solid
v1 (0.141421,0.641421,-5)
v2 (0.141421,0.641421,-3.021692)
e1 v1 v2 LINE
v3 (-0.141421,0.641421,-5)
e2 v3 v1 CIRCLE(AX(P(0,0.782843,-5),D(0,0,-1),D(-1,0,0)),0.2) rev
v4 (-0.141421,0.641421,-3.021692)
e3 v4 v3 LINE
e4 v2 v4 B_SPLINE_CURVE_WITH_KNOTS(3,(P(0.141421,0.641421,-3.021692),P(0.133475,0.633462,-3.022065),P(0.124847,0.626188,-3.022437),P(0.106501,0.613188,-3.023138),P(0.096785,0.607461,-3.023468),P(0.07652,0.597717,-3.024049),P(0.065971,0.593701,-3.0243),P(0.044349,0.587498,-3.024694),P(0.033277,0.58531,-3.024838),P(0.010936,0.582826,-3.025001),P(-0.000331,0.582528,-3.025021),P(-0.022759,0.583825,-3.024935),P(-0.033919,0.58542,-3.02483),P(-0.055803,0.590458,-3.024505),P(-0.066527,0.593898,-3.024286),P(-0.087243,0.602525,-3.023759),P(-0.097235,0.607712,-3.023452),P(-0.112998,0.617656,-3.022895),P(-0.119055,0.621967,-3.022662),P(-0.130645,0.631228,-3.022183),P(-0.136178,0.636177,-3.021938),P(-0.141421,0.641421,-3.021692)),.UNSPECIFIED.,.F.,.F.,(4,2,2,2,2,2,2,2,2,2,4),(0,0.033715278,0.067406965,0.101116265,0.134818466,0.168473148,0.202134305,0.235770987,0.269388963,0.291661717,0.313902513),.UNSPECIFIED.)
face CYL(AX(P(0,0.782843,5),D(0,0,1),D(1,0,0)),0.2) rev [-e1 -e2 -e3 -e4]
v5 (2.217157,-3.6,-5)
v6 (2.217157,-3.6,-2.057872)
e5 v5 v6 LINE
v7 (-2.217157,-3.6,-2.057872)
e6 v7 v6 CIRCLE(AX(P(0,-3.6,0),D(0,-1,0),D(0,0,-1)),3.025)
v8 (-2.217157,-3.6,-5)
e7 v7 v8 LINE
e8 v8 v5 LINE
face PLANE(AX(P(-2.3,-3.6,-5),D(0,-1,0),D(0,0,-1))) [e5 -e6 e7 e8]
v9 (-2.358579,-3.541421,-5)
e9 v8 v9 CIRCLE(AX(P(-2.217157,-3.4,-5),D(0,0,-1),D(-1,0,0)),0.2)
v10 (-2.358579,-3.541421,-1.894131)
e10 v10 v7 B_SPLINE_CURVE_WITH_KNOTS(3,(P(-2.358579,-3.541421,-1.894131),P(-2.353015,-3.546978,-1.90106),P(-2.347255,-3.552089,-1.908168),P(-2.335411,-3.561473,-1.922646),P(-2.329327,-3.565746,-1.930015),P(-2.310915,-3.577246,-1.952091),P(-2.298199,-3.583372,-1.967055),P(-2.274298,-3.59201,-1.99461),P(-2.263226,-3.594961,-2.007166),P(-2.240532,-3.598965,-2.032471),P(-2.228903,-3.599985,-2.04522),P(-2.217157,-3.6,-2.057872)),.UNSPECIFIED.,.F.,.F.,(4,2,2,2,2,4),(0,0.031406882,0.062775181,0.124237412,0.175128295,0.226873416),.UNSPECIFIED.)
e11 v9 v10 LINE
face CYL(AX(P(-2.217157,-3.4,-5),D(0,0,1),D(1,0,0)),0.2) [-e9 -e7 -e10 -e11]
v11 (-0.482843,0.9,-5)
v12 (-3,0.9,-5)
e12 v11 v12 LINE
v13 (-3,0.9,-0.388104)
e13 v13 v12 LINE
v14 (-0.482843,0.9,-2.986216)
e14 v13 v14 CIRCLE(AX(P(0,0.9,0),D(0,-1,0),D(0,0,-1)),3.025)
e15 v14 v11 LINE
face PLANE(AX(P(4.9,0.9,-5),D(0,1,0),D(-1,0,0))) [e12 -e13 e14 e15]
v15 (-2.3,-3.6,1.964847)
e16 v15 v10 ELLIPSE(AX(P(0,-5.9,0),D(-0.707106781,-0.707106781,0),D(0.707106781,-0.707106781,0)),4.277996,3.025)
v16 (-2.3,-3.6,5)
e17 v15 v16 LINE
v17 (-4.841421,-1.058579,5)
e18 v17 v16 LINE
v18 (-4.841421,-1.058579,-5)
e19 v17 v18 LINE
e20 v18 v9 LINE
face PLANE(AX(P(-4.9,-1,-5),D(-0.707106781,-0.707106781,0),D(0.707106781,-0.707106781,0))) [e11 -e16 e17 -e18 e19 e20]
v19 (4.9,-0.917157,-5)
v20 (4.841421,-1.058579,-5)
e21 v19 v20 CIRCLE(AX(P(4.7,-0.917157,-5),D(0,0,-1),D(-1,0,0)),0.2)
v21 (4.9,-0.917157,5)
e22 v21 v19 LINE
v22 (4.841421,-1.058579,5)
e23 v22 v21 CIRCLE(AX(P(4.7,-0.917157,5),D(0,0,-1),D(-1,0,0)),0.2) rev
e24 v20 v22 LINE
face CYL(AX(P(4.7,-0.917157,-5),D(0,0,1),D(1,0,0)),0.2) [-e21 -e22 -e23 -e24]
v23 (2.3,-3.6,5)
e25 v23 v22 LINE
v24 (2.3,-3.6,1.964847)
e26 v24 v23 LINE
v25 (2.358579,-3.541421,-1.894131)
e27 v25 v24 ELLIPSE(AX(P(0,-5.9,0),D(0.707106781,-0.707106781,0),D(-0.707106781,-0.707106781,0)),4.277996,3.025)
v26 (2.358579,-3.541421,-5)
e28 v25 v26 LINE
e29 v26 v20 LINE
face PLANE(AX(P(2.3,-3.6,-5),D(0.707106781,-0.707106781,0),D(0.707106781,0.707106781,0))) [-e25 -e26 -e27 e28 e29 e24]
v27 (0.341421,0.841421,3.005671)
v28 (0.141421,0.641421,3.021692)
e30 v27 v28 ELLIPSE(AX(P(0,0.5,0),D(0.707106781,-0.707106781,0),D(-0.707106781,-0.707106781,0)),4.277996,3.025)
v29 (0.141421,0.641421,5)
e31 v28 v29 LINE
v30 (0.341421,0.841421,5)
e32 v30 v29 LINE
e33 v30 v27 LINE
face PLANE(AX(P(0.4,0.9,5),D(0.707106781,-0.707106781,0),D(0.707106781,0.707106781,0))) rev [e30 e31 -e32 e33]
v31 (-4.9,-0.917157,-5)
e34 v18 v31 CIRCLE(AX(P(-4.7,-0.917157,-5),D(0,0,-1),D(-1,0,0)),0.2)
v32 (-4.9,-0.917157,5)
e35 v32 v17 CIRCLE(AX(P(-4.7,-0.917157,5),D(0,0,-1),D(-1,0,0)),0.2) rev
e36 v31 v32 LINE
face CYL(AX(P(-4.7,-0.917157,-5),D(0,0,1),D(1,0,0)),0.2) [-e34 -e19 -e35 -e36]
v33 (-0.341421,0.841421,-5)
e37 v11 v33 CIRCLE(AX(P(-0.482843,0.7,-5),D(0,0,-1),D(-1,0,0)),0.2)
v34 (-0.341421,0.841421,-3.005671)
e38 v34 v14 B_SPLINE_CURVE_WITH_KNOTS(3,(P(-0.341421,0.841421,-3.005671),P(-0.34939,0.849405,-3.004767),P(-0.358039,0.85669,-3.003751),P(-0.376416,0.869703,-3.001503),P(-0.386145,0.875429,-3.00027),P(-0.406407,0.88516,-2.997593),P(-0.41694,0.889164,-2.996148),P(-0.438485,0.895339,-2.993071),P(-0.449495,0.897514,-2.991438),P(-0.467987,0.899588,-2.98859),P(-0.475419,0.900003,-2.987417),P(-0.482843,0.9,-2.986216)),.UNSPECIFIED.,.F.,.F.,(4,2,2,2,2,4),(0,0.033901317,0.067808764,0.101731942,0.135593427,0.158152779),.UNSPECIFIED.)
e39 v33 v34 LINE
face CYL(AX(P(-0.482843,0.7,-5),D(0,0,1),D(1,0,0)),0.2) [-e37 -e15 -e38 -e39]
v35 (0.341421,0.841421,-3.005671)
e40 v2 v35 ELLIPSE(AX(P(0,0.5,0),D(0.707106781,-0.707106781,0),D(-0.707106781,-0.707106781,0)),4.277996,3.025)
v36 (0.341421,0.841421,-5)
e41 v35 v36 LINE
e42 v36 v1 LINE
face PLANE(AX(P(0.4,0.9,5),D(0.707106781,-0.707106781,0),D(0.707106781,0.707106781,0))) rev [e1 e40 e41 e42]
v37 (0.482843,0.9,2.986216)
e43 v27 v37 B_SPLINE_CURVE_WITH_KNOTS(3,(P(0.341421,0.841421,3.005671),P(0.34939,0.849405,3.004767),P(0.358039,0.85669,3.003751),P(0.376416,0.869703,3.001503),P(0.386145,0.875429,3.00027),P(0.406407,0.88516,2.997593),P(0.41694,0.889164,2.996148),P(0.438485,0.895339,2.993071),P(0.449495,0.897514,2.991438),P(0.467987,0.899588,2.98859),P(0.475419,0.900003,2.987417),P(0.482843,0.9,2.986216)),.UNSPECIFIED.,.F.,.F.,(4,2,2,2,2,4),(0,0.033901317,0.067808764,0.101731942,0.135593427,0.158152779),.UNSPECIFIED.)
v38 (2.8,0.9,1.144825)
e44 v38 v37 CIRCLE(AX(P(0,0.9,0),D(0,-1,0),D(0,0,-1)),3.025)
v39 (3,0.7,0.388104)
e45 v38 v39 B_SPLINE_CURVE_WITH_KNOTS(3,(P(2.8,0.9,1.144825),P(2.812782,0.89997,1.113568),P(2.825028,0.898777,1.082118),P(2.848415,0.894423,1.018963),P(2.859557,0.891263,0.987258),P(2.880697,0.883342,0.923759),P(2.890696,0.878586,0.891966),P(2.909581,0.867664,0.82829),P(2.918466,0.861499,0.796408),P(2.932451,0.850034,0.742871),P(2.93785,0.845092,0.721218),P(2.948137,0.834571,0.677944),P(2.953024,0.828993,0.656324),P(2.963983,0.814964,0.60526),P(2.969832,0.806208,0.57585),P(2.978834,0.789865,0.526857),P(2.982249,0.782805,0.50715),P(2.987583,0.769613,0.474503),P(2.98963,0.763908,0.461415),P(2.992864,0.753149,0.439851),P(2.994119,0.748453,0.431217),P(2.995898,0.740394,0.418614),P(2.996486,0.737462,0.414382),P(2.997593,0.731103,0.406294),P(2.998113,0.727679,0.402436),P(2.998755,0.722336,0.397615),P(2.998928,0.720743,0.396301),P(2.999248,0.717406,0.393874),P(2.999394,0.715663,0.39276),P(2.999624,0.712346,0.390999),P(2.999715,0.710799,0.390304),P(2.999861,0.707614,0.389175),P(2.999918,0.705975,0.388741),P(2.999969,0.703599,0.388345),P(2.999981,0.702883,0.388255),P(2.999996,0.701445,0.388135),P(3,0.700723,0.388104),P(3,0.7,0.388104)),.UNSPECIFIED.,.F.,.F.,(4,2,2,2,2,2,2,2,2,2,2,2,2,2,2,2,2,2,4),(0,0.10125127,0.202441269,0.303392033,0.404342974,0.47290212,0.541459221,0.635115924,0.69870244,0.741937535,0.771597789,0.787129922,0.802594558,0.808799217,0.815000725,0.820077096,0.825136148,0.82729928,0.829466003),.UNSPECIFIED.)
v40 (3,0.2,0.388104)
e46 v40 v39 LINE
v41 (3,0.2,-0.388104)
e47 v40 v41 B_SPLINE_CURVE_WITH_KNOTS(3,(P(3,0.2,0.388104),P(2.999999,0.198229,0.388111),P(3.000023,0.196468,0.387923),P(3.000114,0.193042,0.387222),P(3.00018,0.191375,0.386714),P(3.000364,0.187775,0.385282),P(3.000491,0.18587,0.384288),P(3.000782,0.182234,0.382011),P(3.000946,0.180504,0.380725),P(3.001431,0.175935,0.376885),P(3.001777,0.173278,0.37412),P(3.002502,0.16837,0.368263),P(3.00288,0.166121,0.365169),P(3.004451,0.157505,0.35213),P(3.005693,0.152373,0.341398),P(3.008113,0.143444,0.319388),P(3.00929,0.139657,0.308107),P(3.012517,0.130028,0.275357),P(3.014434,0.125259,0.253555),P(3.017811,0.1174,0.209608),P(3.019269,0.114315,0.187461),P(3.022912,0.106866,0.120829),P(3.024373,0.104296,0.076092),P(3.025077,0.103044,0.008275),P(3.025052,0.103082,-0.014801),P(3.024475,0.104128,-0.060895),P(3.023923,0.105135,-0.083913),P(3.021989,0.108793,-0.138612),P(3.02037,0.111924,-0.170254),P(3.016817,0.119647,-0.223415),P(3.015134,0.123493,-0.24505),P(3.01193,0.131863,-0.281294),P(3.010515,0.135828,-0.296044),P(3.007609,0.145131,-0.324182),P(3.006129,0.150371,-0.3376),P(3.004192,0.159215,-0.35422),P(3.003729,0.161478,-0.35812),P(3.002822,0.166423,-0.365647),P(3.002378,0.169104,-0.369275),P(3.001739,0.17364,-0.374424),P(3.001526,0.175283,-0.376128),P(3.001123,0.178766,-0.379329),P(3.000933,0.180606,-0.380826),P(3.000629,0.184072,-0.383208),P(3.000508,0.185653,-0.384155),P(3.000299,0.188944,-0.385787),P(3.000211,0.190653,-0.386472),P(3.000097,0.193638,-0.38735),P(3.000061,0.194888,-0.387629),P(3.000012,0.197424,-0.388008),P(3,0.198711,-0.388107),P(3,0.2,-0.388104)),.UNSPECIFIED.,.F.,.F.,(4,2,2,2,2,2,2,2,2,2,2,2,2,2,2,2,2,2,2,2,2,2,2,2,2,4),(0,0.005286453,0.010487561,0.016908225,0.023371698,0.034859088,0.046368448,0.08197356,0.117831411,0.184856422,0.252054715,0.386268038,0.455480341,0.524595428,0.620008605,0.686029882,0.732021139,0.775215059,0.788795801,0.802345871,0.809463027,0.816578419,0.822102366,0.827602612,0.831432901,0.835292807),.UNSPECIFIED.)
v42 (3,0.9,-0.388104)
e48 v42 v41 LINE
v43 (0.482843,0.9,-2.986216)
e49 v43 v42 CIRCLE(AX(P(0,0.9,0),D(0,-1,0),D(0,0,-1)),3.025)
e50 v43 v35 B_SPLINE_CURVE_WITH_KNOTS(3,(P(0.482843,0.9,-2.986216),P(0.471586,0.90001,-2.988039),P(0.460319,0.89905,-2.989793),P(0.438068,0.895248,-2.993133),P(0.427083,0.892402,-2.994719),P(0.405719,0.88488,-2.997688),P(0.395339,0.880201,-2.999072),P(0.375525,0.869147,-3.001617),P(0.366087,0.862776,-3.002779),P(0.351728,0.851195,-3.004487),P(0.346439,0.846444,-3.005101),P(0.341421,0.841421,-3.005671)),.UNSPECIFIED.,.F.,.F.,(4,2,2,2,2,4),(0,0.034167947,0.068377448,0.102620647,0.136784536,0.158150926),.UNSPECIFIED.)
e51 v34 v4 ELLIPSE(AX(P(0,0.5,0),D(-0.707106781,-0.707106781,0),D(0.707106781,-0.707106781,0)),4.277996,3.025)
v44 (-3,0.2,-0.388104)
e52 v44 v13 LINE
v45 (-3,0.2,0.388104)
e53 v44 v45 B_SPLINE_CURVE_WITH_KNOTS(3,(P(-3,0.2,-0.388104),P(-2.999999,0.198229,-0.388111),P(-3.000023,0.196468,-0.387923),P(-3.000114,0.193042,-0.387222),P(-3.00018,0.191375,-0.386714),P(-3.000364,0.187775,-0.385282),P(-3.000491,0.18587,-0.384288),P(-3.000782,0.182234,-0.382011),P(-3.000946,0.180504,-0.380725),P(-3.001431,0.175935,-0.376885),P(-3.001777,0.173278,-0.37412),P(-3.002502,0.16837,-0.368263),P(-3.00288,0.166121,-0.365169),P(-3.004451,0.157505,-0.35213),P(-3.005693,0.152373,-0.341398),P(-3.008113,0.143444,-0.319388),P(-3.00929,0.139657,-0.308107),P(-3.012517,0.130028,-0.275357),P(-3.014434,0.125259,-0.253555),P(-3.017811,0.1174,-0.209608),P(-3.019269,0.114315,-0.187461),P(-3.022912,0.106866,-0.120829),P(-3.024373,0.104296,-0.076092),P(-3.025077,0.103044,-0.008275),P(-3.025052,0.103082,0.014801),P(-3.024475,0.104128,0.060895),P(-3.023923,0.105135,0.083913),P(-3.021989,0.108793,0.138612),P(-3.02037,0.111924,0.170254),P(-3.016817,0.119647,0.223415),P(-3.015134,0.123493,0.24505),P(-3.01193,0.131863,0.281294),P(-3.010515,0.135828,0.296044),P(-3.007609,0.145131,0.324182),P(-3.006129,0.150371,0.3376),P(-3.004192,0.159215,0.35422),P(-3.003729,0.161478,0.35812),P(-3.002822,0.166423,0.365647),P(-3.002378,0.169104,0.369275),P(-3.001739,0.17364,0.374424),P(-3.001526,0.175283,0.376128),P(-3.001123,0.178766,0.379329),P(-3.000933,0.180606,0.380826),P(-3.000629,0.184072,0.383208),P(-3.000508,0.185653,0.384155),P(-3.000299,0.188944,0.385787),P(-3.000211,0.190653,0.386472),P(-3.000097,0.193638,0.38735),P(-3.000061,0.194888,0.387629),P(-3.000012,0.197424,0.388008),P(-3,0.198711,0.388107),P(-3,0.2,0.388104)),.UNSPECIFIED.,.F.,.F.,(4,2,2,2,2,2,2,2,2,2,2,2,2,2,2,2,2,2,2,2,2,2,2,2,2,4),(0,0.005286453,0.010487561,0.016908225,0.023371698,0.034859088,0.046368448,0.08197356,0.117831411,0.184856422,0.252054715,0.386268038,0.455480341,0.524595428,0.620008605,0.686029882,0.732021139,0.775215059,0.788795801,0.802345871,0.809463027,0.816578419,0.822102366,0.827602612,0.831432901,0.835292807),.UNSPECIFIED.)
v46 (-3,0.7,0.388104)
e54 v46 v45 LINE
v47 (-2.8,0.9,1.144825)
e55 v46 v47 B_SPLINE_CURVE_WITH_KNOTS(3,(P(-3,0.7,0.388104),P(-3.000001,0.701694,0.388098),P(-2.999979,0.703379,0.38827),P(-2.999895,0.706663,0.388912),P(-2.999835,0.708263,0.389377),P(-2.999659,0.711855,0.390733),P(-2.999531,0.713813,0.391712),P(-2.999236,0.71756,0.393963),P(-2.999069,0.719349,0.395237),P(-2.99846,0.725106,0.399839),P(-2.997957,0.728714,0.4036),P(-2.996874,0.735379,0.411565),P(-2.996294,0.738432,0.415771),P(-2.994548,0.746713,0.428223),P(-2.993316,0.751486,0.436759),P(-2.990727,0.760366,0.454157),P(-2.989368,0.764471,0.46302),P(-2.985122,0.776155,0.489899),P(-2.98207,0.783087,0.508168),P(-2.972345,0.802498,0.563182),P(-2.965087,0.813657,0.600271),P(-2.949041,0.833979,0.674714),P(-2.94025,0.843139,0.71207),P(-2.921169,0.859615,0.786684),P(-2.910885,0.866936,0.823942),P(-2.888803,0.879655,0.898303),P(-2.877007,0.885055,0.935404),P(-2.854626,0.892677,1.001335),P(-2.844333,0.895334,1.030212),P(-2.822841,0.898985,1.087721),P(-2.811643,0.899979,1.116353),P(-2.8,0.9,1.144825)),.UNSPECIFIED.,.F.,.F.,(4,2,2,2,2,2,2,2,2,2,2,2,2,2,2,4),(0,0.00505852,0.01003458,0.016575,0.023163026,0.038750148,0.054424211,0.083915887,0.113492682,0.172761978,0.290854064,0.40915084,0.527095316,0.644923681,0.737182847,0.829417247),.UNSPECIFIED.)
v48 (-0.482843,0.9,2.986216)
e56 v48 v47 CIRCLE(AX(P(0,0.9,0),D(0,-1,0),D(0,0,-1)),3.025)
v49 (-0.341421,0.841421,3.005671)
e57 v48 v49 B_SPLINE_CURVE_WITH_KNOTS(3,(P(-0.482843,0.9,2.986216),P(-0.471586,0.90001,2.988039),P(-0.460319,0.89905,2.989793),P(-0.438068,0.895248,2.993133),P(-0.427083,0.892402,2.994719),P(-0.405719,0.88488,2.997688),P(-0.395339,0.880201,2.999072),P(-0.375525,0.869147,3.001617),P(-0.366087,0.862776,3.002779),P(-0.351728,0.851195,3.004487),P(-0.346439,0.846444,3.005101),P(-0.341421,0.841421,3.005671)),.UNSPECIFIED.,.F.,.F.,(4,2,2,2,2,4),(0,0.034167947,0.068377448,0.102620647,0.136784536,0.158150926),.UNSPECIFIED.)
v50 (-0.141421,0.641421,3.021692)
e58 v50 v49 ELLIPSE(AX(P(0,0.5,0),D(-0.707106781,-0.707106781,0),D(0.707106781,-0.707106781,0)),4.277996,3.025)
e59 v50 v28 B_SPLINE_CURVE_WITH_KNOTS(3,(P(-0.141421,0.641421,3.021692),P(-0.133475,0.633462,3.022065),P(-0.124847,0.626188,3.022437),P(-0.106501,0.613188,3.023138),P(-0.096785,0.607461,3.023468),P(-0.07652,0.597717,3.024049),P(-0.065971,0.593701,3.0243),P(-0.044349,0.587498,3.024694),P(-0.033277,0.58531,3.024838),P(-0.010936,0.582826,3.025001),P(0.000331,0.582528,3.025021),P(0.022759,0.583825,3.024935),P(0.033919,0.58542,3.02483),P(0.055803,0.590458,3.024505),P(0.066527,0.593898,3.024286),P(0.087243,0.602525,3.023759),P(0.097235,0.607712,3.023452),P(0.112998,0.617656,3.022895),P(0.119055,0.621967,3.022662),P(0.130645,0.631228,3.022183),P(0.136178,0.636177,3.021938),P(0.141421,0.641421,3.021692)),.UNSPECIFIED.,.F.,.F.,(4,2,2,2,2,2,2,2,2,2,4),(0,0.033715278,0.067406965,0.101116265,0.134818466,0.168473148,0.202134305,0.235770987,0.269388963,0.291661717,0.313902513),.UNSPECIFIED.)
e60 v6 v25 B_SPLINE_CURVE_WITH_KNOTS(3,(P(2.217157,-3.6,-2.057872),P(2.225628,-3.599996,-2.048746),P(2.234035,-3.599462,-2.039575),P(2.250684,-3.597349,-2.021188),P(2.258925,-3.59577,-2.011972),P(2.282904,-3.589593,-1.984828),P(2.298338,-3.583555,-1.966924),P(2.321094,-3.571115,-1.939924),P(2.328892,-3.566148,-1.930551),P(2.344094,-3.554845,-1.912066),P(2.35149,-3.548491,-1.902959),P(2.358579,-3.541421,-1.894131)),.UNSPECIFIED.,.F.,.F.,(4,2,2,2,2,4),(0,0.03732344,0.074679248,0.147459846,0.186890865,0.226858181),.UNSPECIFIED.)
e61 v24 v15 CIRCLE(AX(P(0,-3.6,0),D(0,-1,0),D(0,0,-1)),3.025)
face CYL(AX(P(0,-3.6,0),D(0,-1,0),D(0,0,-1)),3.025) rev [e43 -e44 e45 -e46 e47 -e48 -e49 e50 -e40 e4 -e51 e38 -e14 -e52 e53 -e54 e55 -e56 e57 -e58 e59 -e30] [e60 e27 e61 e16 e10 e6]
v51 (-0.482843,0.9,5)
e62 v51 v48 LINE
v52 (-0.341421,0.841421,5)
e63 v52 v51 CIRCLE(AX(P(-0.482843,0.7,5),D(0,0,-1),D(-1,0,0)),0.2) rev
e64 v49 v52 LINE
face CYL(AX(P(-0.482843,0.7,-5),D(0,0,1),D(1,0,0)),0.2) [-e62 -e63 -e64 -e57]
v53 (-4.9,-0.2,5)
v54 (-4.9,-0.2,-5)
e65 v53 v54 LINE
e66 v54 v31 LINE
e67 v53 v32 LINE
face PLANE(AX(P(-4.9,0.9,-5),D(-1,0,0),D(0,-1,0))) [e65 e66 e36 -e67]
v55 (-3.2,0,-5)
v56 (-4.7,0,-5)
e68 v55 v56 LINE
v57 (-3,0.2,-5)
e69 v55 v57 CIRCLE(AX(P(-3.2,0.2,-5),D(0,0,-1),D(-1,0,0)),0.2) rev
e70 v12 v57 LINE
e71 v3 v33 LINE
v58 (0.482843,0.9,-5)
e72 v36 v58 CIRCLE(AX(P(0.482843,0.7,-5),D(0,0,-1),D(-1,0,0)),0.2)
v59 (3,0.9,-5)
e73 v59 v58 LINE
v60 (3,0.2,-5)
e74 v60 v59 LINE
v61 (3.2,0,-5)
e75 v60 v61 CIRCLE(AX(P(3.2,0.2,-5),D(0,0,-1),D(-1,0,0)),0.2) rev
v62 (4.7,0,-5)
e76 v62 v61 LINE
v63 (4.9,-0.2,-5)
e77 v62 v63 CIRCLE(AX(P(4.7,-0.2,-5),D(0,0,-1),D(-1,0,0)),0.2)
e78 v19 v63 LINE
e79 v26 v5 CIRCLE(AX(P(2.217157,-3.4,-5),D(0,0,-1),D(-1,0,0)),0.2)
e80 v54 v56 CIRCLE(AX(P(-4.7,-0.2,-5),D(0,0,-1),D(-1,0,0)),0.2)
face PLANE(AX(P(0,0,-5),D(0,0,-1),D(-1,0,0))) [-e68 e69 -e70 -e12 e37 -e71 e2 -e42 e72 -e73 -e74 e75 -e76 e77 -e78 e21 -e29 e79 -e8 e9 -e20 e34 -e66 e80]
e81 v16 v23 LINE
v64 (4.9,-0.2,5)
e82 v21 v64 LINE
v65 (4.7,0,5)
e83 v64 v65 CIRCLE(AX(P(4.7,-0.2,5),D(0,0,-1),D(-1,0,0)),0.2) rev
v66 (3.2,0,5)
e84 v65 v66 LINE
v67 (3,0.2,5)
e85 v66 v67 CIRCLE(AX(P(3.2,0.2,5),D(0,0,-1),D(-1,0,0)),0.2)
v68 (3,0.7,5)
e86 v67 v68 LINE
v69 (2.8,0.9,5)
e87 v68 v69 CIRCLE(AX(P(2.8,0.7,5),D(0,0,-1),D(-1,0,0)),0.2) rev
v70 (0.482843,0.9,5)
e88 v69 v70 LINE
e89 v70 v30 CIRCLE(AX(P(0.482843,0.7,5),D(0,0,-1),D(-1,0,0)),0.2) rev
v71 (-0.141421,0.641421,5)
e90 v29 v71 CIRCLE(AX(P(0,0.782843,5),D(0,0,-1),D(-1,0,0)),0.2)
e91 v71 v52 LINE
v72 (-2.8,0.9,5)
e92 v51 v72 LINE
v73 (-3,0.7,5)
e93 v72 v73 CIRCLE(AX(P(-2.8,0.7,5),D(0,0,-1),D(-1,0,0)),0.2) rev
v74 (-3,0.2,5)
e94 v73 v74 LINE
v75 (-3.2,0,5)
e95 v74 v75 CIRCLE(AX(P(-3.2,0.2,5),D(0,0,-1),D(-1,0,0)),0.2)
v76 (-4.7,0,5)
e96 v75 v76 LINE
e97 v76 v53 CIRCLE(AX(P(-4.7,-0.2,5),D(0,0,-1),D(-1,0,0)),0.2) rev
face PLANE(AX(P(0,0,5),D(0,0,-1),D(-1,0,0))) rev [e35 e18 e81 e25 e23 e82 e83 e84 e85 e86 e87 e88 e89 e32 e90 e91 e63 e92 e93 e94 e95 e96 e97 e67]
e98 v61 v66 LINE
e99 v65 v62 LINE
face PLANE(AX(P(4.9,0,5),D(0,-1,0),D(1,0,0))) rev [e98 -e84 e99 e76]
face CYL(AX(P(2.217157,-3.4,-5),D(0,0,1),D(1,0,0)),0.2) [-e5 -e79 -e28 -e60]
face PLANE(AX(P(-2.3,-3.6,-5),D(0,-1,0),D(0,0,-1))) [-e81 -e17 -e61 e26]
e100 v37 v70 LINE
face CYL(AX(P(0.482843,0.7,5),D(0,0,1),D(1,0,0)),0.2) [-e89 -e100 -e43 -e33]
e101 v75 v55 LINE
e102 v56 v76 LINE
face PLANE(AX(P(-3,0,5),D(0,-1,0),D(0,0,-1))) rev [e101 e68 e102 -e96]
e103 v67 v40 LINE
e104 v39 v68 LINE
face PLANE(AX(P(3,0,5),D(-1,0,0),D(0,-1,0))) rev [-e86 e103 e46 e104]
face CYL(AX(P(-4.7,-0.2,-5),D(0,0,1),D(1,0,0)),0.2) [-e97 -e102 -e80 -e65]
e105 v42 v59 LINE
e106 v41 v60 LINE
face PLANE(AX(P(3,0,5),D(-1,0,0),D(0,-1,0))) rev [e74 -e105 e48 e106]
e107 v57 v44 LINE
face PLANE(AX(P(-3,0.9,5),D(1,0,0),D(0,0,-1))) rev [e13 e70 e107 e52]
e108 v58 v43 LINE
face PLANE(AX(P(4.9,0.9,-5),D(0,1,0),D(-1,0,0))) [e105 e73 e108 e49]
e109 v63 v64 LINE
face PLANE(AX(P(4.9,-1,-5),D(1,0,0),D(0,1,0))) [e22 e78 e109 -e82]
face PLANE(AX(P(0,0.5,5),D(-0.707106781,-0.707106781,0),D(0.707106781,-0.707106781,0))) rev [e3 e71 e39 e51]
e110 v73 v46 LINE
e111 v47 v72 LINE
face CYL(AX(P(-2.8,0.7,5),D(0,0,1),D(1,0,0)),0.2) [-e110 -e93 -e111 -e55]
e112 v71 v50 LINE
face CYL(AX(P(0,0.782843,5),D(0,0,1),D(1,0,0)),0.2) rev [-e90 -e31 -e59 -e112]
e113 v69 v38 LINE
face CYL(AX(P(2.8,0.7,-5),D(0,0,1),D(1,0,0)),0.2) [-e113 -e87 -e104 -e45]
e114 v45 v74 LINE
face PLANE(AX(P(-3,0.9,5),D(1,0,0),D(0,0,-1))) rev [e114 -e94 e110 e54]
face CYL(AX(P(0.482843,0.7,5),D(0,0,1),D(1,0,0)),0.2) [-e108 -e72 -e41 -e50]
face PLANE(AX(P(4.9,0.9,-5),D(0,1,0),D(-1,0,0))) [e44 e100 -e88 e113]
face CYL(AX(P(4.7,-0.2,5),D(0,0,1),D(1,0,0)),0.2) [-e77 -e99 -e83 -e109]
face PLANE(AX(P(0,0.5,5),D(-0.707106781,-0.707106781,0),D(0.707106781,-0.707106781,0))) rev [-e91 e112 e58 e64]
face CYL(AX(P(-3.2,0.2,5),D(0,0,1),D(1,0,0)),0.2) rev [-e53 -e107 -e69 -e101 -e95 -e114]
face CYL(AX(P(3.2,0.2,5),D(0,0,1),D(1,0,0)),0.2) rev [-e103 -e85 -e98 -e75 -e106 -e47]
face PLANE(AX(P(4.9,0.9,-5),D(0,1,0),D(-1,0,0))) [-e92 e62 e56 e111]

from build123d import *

# Parameters (mm, degrees)
EXTRUDE_BODY_DEPTH = 10
SKETCH2_W          = 1.9
SKETCH2_H          = 0.9
CUT_EXTRUDE1_DEPTH = 12.703418304
SKETCH3_W          = 1.9
SKETCH3_H          = 0.9
CUT_EXTRUDE2_DEPTH = 12.703418304
CUT_EXTRUDE3_DEPTH = 12.703418304
HOLE_REVOLVE_D     = 6.05
EDGE_FILLETS_R     = 0.2


with BuildPart() as part:
    # Sketch1 → Extrude Body (new body)
    with BuildSketch(Plane.XY.offset(5)):
        Polygon((4.9, -1), (4.9, 0.9), (-4.9, 0.9), (-4.9, -1), (-2.3, -3.6), (2.3, -3.6), align=None)
    extrude(amount=-EXTRUDE_BODY_DEPTH)

    # Sketch2 → Cut-Extrude1 (cut, through all)
    with BuildSketch(Plane(origin=(0, 0, -5), x_dir=(-1, 0, 0), z_dir=(0, 0, -1))):
        with Locations((3.95, 0.45)):
            Rectangle(SKETCH2_W, SKETCH2_H)
    extrude(amount=-CUT_EXTRUDE1_DEPTH, mode=Mode.SUBTRACT)

    # Sketch3 → Cut-Extrude2 (cut, through all)
    with BuildSketch(Plane(origin=(0, 0, -5), x_dir=(-1, 0, 0), z_dir=(0, 0, -1))):
        with Locations((-3.95, 0.45)):
            Rectangle(SKETCH3_W, SKETCH3_H)
    extrude(amount=-CUT_EXTRUDE2_DEPTH, mode=Mode.SUBTRACT)

    # Sketch4 → Cut-Extrude3 (cut, through all)
    with BuildSketch(Plane(origin=(0, 0, -5), x_dir=(-1, 0, 0), z_dir=(0, 0, -1))):
        Polygon((0.4, 0.9), (-0.4, 0.9), (0, 0.5), align=None)
    extrude(amount=-CUT_EXTRUDE3_DEPTH, mode=Mode.SUBTRACT)

    # Hole Revolve (through all)
    with Locations(Plane(origin=(0, -3.6, 0), x_dir=(-1, 0, 0), z_dir=(0, -1, 0))):
        with Locations((0, 0)):
            Hole(HOLE_REVOLVE_D / 2)

    # Edge Fillets
    # the kernel refuses this fillet: 0.2 mm, written as the material it adds along each edge
    with BuildSketch(Plane(origin=(3, 0, -5), x_dir=(1, 0, 0), z_dir=(0, 0, 1))) as edge_fillets_piece_1_section:
        with BuildLine():
            CenterArc((EDGE_FILLETS_R, EDGE_FILLETS_R), EDGE_FILLETS_R, 180, 90)
            Line((0, EDGE_FILLETS_R), (0, 0))
            Line((0, 0), (EDGE_FILLETS_R, 0))
        make_face()
    edge_fillets_piece_1 = extrude(amount=5.111895633, mode=Mode.PRIVATE)
    edge_fillets_piece_1 = edge_fillets_piece_1 - Plane(origin=(0, 0.044194975, 0), x_dir=(1, 0, 0), z_dir=(0, 1, 0)) * Cylinder(3.025, 12, mode=Mode.PRIVATE)
    add(edge_fillets_piece_1)
    with BuildSketch(Plane(origin=(3, 0, -0.111895633), x_dir=(1, 0, 0), z_dir=(0, 0, 1))) as edge_fillets_piece_2_section:
        with BuildLine():
            CenterArc((EDGE_FILLETS_R, EDGE_FILLETS_R), EDGE_FILLETS_R, 180, 90)
            Line((0, EDGE_FILLETS_R), (0, 0))
            Line((0, 0), (EDGE_FILLETS_R, 0))
        make_face()
    edge_fillets_piece_2 = extrude(amount=5.111895633, mode=Mode.PRIVATE)
    edge_fillets_piece_2 = edge_fillets_piece_2 - Plane(origin=(0, 0.044194976, 0), x_dir=(1, 0, 0), z_dir=(0, 1, 0)) * Cylinder(3.025, 12, mode=Mode.PRIVATE)
    add(edge_fillets_piece_2)
    with BuildSketch(Plane(origin=(-3, 0, -0.111895633), x_dir=(-1, 0, 0), z_dir=(0, 0, 1))) as edge_fillets_piece_3_section:
        with BuildLine():
            CenterArc((EDGE_FILLETS_R, -EDGE_FILLETS_R), EDGE_FILLETS_R, 90, 90)
            Line((0, -EDGE_FILLETS_R), (0, 0))
            Line((0, 0), (EDGE_FILLETS_R, 0))
        make_face()
    edge_fillets_piece_3 = extrude(amount=5.111895633, mode=Mode.PRIVATE)
    edge_fillets_piece_3 = edge_fillets_piece_3 - Plane(origin=(0, 0.044194976, 0), x_dir=(1, 0, 0), z_dir=(0, 1, 0)) * Cylinder(3.025, 12, mode=Mode.PRIVATE)
    add(edge_fillets_piece_3)
    with BuildSketch(Plane(origin=(-3, 0, -5), x_dir=(-1, 0, 0), z_dir=(0, 0, 1))) as edge_fillets_piece_4_section:
        with BuildLine():
            CenterArc((EDGE_FILLETS_R, -EDGE_FILLETS_R), EDGE_FILLETS_R, 90, 90)
            Line((0, -EDGE_FILLETS_R), (0, 0))
            Line((0, 0), (EDGE_FILLETS_R, 0))
        make_face()
    edge_fillets_piece_4 = extrude(amount=5.111895633, mode=Mode.PRIVATE)
    edge_fillets_piece_4 = edge_fillets_piece_4 - Plane(origin=(0, 0.044194976, 0), x_dir=(1, 0, 0), z_dir=(0, 1, 0)) * Cylinder(3.025, 12, mode=Mode.PRIVATE)
    add(edge_fillets_piece_4)
    with BuildSketch(Plane(origin=(0, 0.5, 2.525), x_dir=(-0.7071067811865454, 0.7071067811865497, 0), z_dir=(0, 0, 1))) as edge_fillets_piece_5_section:
        with BuildLine():
            CenterArc((EDGE_FILLETS_R, -EDGE_FILLETS_R), EDGE_FILLETS_R, 90, 90)
            Line((0, -EDGE_FILLETS_R), (0, 0))
            Line((0, 0), (EDGE_FILLETS_R, 0))
        make_face()
    edge_fillets_piece_5 = extrude(amount=2.475, mode=Mode.PRIVATE)
    edge_fillets_piece_5 = edge_fillets_piece_5 - Plane(origin=(0, 0.564041319, 0), x_dir=(1, 0, 0), z_dir=(0, 1, 0)) * Cylinder(3.025, 6, mode=Mode.PRIVATE)
    add(edge_fillets_piece_5)
    with BuildSketch(Plane(origin=(0, 0.5, -5), x_dir=(-0.7071067811865455, 0.7071067811865496, 0), z_dir=(0, 0, 1))) as edge_fillets_piece_6_section:
        with BuildLine():
            CenterArc((EDGE_FILLETS_R, -EDGE_FILLETS_R), EDGE_FILLETS_R, 90, 90)
            Line((0, -EDGE_FILLETS_R), (0, 0))
            Line((0, 0), (EDGE_FILLETS_R, 0))
        make_face()
    edge_fillets_piece_6 = extrude(amount=2.475, mode=Mode.PRIVATE)
    edge_fillets_piece_6 = edge_fillets_piece_6 - Plane(origin=(0, 0.564041319, 0), x_dir=(1, 0, 0), z_dir=(0, 1, 0)) * Cylinder(3.025, 6, mode=Mode.PRIVATE)
    add(edge_fillets_piece_6)
    # the kernel refuses this fillet: 0.2 mm, written as the material it takes off along each edge
    with BuildSketch(Plane(origin=(4.9, 0, -5.5), x_dir=(0, -1, 0), z_dir=(0, 0, 1))) as edge_fillets_2_piece_1:
        with BuildLine():
            CenterArc((EDGE_FILLETS_R, -EDGE_FILLETS_R), EDGE_FILLETS_R, 90, 90)
            Line((0, -EDGE_FILLETS_R), (0, 0))
            Line((0, 0), (EDGE_FILLETS_R, 0))
        make_face()
    extrude(amount=11, mode=Mode.SUBTRACT)
    with BuildSketch(Plane(origin=(-4.9, -1, 5.207106781), x_dir=(0.7071067811865468, -0.7071067811865481, 0), z_dir=(0, 0, -1)), Plane(origin=(4.9, -1, 5.207106781), x_dir=(0, 1, 0), z_dir=(0, 0, -1))) as edge_fillets_2_piece_2:
        with BuildLine():
            CenterArc((EDGE_FILLETS_R * 0.414213562373, -EDGE_FILLETS_R), EDGE_FILLETS_R, 90, 45)
            Line((-EDGE_FILLETS_R * 0.292893218813, -EDGE_FILLETS_R * 0.292893218813), (0, 0))
            Line((0, 0), (EDGE_FILLETS_R * 0.414213562373, 0))
        make_face()
    extrude(amount=10.414213562, mode=Mode.SUBTRACT)
    with BuildSketch(Plane(origin=(3, 0.9, -0.111895633), x_dir=(-1, 0, 0), z_dir=(0, 0, 1)), Plane(origin=(-3, 0.9, -0.111895633), x_dir=(0, -1, 0), z_dir=(0, 0, 1))) as edge_fillets_2_piece_3:
        with BuildLine():
            CenterArc((EDGE_FILLETS_R, EDGE_FILLETS_R), EDGE_FILLETS_R, 180, 90)
            Line((0, EDGE_FILLETS_R), (0, 0))
            Line((0, 0), (EDGE_FILLETS_R, 0))
        make_face()
    extrude(amount=5.611895633, mode=Mode.SUBTRACT)
    with BuildSketch(Plane(origin=(0.4, 0.9, -5.207106781), x_dir=(1, 0, 0), z_dir=(0, 0, 1)), Plane(origin=(-0.4, 0.9, -5.207106781), x_dir=(0.7071067811865449, -0.7071067811865502, 0), z_dir=(0, 0, 1))) as edge_fillets_2_piece_4:
        with BuildLine():
            CenterArc((EDGE_FILLETS_R * 0.414213562373, -EDGE_FILLETS_R), EDGE_FILLETS_R, 90, 45)
            Line((-EDGE_FILLETS_R * 0.292893218813, -EDGE_FILLETS_R * 0.292893218813), (0, 0))
            Line((0, 0), (EDGE_FILLETS_R * 0.414213562373, 0))
        make_face()
    extrude(amount=2.415776469, mode=Mode.SUBTRACT)
    with BuildSketch(Plane(origin=(-0.4, 0.9, 2.791330312), x_dir=(-1, 0, 0), z_dir=(0, 0, 1)), Plane(origin=(0.4, 0.9, 2.791330312), x_dir=(-0.7071067811865465, -0.7071067811865485, 0), z_dir=(0, 0, 1))) as edge_fillets_2_piece_5:
        with BuildLine():
            CenterArc((EDGE_FILLETS_R * 0.414213562373, EDGE_FILLETS_R), EDGE_FILLETS_R, 225, 45)
            Line((-EDGE_FILLETS_R * 0.292893218813, EDGE_FILLETS_R * 0.292893218813), (0, 0))
            Line((0, 0), (EDGE_FILLETS_R * 0.414213562373, 0))
        make_face()
    extrude(amount=2.415776469, mode=Mode.SUBTRACT)
    with BuildSketch(Plane(origin=(-4.9, 0, -5.5), x_dir=(0, -1, 0), z_dir=(0, 0, 1))) as edge_fillets_2_piece_6:
        with BuildLine():
            CenterArc((EDGE_FILLETS_R, EDGE_FILLETS_R), EDGE_FILLETS_R, 180, 90)
            Line((0, EDGE_FILLETS_R), (0, 0))
            Line((0, 0), (EDGE_FILLETS_R, 0))
        make_face()
    extrude(amount=11, mode=Mode.SUBTRACT)
    with BuildSketch(Plane(origin=(-2.3, -3.6, -1.757740541), x_dir=(-0.7071067811865448, 0.7071067811865502, 0), z_dir=(0, 0, -1))) as edge_fillets_2_piece_7:
        with BuildLine():
            CenterArc((EDGE_FILLETS_R * 0.414213562373, EDGE_FILLETS_R), EDGE_FILLETS_R, 225, 45)
            Line((-EDGE_FILLETS_R * 0.292893218813, EDGE_FILLETS_R * 0.292893218813), (0, 0))
            Line((0, 0), (EDGE_FILLETS_R * 0.414213562373, 0))
        make_face()
    extrude(amount=3.44936624, mode=Mode.SUBTRACT)
    with BuildSketch(Plane(origin=(2.3, -3.6, -1.757740541), x_dir=(0.7071067811865476, 0.7071067811865476, 0), z_dir=(0, 0, -1))) as edge_fillets_2_piece_8:
        with BuildLine():
            CenterArc((EDGE_FILLETS_R * 0.414213562373, -EDGE_FILLETS_R), EDGE_FILLETS_R, 90, 45)
            Line((-EDGE_FILLETS_R * 0.292893218813, -EDGE_FILLETS_R * 0.292893218813), (0, 0))
            Line((0, 0), (EDGE_FILLETS_R * 0.414213562373, 0))
        make_face()
    extrude(amount=3.44936624, mode=Mode.SUBTRACT)


solid = part.part
